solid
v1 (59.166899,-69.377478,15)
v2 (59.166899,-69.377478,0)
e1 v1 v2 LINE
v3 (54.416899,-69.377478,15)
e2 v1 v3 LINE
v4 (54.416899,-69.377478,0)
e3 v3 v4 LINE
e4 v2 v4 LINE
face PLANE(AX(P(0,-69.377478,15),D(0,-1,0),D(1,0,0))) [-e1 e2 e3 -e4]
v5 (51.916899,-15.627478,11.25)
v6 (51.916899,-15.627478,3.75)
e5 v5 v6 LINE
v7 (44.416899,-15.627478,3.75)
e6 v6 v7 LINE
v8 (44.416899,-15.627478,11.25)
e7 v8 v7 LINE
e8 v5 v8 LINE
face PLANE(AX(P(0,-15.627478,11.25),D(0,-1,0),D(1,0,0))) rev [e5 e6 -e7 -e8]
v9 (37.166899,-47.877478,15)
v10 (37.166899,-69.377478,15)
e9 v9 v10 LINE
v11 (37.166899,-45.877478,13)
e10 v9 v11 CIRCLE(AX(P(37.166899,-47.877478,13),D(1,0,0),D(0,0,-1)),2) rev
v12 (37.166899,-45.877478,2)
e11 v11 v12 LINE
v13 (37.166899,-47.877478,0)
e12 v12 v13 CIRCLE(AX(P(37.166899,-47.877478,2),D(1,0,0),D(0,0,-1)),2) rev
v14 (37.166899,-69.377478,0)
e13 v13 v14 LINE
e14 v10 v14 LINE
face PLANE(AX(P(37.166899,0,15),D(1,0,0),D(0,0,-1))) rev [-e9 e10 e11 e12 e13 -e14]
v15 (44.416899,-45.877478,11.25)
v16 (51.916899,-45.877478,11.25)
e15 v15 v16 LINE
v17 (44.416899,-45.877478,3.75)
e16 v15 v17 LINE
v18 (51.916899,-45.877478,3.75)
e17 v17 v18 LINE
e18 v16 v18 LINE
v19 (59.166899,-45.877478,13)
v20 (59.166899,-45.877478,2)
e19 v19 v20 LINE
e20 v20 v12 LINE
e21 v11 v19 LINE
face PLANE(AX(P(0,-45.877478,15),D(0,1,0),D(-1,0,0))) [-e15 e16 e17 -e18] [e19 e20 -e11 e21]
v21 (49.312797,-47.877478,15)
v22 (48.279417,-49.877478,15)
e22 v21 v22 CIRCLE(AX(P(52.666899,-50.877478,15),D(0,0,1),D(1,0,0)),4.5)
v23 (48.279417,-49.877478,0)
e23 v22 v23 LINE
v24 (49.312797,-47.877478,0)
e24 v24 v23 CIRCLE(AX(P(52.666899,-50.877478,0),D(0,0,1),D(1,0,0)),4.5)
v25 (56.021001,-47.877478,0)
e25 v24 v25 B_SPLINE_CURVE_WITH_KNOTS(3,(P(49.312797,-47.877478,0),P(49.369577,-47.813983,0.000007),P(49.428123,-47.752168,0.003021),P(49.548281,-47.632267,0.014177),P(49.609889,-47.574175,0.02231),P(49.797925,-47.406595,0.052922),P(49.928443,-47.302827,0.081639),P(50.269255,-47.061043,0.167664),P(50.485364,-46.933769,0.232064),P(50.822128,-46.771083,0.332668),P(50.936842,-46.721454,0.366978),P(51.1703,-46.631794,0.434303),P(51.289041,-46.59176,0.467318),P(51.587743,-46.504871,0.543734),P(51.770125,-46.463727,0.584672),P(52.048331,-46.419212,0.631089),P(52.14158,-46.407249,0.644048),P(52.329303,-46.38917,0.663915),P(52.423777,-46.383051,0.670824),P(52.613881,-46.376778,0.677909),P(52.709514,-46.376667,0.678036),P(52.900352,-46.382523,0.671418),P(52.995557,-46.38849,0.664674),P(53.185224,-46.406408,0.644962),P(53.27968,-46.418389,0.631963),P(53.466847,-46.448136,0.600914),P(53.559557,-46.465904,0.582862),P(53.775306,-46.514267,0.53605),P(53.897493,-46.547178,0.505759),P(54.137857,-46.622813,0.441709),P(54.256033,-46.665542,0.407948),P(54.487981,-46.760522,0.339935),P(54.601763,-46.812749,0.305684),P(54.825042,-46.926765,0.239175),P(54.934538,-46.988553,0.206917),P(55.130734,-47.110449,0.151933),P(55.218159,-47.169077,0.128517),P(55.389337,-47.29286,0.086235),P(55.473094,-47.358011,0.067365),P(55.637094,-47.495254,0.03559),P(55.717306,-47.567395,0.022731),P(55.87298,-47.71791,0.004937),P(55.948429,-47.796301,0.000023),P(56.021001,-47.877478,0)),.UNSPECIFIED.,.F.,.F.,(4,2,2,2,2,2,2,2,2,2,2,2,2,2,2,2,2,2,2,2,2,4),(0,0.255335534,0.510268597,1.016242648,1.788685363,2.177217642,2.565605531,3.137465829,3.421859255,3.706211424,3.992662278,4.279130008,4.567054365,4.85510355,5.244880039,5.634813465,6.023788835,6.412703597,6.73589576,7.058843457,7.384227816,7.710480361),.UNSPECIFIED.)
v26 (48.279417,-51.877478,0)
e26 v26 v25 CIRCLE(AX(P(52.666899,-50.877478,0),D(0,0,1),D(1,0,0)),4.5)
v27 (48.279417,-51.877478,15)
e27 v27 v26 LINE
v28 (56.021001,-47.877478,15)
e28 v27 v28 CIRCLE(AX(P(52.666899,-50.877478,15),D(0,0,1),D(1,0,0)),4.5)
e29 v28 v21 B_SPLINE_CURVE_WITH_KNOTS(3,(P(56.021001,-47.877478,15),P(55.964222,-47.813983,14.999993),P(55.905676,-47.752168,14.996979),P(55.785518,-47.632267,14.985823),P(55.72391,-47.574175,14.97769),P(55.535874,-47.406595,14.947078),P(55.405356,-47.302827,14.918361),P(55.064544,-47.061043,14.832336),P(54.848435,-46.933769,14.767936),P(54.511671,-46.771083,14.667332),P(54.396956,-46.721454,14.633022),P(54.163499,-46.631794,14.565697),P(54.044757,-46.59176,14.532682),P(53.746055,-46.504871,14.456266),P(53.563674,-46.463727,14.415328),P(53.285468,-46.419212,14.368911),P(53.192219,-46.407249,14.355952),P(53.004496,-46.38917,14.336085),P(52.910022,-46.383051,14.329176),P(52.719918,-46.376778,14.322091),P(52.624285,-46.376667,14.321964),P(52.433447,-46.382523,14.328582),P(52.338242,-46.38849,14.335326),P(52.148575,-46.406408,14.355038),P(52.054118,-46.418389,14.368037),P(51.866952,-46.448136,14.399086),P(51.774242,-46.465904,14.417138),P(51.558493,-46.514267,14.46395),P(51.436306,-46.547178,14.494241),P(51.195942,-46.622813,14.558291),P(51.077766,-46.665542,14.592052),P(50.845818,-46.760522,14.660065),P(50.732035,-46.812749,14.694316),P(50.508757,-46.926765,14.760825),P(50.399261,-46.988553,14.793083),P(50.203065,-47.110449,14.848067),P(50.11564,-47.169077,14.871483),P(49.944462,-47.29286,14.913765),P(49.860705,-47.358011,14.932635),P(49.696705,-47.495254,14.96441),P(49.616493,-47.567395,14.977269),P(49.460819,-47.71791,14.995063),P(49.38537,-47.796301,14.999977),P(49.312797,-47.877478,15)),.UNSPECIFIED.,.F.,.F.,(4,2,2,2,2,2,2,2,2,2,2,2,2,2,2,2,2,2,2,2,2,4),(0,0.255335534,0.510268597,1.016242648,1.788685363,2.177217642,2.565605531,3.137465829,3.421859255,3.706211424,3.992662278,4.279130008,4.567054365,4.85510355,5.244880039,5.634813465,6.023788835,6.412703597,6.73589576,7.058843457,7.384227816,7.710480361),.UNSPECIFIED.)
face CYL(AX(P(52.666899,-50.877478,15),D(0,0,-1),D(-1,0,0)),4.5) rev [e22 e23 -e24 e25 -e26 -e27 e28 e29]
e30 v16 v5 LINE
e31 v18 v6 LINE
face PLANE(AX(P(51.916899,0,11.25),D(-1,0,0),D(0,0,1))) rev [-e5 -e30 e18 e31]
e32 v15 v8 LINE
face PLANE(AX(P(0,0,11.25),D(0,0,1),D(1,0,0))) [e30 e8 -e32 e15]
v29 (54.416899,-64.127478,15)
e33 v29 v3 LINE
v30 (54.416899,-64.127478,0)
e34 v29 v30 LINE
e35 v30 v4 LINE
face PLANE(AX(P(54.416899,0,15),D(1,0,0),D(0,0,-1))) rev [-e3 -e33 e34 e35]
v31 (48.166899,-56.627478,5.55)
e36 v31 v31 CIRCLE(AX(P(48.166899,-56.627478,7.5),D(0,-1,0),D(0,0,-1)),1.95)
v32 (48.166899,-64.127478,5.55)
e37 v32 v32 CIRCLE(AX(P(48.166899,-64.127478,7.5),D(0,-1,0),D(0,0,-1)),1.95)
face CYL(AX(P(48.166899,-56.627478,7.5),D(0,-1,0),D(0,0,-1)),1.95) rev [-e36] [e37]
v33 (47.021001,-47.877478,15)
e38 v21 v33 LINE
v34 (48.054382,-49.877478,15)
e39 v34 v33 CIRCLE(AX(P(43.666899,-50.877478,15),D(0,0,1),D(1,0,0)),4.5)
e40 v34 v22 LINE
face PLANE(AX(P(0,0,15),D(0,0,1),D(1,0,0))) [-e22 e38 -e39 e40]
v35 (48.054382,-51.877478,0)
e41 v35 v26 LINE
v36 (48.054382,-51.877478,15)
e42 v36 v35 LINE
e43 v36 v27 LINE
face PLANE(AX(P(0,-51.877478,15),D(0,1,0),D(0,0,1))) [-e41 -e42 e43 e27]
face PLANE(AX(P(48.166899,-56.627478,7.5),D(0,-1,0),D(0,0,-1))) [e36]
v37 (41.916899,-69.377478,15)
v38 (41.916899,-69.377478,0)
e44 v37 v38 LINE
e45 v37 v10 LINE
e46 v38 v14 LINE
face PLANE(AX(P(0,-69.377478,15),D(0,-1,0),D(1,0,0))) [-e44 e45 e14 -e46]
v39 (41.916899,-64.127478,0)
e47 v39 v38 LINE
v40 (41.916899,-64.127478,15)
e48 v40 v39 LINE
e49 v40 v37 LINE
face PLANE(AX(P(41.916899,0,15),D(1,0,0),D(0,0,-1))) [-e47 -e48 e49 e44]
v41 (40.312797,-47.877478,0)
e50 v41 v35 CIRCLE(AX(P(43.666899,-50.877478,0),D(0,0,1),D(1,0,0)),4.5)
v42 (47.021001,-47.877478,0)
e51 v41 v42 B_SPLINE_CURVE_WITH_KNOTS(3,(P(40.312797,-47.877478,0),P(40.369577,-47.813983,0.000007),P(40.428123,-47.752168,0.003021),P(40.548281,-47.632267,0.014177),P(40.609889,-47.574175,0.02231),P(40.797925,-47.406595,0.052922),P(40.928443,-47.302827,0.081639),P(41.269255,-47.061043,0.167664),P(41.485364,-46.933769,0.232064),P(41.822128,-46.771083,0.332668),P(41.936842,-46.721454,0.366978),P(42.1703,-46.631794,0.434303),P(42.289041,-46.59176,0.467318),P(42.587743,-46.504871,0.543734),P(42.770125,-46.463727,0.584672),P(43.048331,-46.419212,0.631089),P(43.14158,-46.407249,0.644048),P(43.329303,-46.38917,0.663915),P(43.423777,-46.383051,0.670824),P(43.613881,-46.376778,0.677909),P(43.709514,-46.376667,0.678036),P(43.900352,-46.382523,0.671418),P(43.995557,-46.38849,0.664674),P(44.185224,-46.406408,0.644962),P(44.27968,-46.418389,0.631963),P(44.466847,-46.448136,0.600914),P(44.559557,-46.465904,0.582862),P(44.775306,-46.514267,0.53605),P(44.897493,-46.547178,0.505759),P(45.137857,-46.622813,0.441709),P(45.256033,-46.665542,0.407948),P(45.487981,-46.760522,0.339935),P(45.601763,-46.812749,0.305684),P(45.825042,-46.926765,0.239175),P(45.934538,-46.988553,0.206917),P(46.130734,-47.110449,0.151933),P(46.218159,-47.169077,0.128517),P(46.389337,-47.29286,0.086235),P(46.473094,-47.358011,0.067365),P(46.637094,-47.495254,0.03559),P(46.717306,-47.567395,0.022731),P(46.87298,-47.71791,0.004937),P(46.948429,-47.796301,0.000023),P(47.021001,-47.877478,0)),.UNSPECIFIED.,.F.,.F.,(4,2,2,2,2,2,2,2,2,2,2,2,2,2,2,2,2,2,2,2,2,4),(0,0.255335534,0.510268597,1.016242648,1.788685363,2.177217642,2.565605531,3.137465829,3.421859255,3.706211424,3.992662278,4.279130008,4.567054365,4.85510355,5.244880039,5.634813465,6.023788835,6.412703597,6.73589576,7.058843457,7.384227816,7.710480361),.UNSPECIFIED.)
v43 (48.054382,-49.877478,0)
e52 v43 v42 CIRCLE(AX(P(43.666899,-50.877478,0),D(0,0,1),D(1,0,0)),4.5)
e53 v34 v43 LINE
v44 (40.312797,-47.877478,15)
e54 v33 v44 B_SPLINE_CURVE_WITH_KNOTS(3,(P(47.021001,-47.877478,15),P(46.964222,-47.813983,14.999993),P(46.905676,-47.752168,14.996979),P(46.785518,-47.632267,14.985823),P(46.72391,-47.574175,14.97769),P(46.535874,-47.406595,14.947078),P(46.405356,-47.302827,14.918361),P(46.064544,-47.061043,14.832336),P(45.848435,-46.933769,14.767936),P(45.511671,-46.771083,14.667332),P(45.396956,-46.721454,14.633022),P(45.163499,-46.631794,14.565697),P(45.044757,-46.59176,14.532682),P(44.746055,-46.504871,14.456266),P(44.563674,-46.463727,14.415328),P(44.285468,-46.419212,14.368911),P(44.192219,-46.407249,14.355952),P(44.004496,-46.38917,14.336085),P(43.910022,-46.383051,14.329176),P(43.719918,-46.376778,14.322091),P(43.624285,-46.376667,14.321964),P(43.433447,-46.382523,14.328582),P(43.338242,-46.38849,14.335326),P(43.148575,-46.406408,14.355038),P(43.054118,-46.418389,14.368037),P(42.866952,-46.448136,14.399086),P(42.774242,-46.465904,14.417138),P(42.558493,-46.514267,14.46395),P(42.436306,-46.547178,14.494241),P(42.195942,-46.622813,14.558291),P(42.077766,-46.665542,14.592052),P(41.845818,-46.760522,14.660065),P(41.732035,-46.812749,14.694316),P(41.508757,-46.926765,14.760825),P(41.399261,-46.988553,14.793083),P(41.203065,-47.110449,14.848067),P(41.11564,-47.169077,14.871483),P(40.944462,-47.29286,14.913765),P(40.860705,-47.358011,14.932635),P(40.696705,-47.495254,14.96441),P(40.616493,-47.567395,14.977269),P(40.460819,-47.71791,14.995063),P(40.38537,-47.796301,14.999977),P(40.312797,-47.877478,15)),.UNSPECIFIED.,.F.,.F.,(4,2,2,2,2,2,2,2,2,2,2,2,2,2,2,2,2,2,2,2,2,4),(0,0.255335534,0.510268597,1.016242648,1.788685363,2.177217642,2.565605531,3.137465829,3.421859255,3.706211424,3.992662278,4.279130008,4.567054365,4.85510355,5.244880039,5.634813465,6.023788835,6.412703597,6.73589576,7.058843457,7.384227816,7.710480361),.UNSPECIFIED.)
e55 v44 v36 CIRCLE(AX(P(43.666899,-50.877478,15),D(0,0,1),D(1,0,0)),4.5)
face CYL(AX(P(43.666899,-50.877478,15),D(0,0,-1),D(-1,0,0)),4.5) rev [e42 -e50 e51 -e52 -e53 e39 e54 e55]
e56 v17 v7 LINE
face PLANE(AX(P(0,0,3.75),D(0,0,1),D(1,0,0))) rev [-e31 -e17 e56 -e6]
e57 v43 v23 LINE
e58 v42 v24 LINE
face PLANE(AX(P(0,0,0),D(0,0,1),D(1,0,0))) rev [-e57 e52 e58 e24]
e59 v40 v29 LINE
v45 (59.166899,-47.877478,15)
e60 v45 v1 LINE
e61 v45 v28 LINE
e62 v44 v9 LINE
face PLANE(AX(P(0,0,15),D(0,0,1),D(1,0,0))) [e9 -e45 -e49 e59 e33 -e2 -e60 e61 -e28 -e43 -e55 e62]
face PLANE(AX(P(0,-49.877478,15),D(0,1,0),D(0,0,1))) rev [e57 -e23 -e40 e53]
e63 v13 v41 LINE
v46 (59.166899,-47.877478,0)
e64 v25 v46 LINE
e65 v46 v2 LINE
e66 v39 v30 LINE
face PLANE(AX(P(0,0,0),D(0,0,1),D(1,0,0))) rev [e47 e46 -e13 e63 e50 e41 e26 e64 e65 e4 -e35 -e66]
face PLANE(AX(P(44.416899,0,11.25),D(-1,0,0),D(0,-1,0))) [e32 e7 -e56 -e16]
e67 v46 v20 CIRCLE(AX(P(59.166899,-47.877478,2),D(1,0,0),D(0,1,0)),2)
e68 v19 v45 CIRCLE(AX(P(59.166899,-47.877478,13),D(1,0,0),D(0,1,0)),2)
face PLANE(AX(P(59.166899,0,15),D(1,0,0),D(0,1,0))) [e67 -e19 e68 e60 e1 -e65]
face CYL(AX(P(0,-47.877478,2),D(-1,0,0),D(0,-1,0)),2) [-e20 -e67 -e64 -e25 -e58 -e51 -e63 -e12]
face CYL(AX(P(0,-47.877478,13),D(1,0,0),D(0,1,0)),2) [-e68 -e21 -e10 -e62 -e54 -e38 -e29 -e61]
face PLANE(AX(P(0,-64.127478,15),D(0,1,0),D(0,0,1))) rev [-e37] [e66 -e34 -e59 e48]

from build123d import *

# Parameters (mm, degrees)
PUSHER_BASE_DEPTH = 15
SKETCH3_R         = 1.95
SCREW_HOLE_DEPTH  = 7.5
SKETCH6_W         = 7.5
SKETCH6_H         = 30.25
PUSHER_HEAD_DEPTH = 3.75
FILLET1_R         = 2


with BuildPart() as part:
    # Sketch1 → pusher base (new body)
    with BuildSketch(Plane.XY):
        Polygon((59.166899441, -45.877477752), (51.666899441, -45.877477752), (44.666899441, -45.877477752), (37.166899441, -45.877477752), (37.166899441, -69.377477752), (41.916899441, -69.377477752), (41.916899441, -64.127477752), (54.416899441, -64.127477752), (54.416899441, -69.377477752), (59.166899441, -69.377477752), align=None)
        with BuildLine():
            Line((48.279417247, -51.877477752), (48.054381634, -51.877477752))
            ThreePointArc((48.054381634, -51.877477752), (39.166899441, -50.877477752), (48.054381634, -49.877477752))
            Line((48.054381634, -49.877477752), (48.279417247, -49.877477752))
            ThreePointArc((48.279417247, -49.877477752), (57.166899441, -50.877477752), (48.279417247, -51.877477752))
        make_face(mode=Mode.SUBTRACT)
    extrude(amount=PUSHER_BASE_DEPTH)

    # Sketch3 → screw hole (cut)
    with BuildSketch(Plane.XZ.offset(64.127477752)):
        with Locations(Location((48.166899441, 7.5, 0), (0, 0, 270))):
            Circle(SKETCH3_R)
    extrude(amount=-SCREW_HOLE_DEPTH, mode=Mode.SUBTRACT)

    # Sketch6 → pusher head (add, symmetric)
    with BuildSketch(Plane.XY.offset(7.5)):
        with Locations((48.166899441, -30.752477752)):
            Rectangle(SKETCH6_W, SKETCH6_H)
    extrude(amount=PUSHER_HEAD_DEPTH, both=True)

    # Fillet1
    # the kernel refuses this fillet: 2 mm, written as the material it takes off along each edge
    with BuildSketch(Plane(origin=(64.166899441, -45.877477752, 0), x_dir=(0, -1, 0), z_dir=(-1, 0, 0)), Plane(origin=(32.166899441, -45.877477752, 15), x_dir=(0, -1, 0), z_dir=(1, 0, 0))) as fillet1_piece_1:
        with BuildLine():
            CenterArc((FILLET1_R, FILLET1_R), FILLET1_R, 180, 90)
            Line((0, FILLET1_R), (0, 0))
            Line((0, 0), (FILLET1_R, 0))
        make_face()
    extrude(amount=32, mode=Mode.SUBTRACT)


solid = part.part
